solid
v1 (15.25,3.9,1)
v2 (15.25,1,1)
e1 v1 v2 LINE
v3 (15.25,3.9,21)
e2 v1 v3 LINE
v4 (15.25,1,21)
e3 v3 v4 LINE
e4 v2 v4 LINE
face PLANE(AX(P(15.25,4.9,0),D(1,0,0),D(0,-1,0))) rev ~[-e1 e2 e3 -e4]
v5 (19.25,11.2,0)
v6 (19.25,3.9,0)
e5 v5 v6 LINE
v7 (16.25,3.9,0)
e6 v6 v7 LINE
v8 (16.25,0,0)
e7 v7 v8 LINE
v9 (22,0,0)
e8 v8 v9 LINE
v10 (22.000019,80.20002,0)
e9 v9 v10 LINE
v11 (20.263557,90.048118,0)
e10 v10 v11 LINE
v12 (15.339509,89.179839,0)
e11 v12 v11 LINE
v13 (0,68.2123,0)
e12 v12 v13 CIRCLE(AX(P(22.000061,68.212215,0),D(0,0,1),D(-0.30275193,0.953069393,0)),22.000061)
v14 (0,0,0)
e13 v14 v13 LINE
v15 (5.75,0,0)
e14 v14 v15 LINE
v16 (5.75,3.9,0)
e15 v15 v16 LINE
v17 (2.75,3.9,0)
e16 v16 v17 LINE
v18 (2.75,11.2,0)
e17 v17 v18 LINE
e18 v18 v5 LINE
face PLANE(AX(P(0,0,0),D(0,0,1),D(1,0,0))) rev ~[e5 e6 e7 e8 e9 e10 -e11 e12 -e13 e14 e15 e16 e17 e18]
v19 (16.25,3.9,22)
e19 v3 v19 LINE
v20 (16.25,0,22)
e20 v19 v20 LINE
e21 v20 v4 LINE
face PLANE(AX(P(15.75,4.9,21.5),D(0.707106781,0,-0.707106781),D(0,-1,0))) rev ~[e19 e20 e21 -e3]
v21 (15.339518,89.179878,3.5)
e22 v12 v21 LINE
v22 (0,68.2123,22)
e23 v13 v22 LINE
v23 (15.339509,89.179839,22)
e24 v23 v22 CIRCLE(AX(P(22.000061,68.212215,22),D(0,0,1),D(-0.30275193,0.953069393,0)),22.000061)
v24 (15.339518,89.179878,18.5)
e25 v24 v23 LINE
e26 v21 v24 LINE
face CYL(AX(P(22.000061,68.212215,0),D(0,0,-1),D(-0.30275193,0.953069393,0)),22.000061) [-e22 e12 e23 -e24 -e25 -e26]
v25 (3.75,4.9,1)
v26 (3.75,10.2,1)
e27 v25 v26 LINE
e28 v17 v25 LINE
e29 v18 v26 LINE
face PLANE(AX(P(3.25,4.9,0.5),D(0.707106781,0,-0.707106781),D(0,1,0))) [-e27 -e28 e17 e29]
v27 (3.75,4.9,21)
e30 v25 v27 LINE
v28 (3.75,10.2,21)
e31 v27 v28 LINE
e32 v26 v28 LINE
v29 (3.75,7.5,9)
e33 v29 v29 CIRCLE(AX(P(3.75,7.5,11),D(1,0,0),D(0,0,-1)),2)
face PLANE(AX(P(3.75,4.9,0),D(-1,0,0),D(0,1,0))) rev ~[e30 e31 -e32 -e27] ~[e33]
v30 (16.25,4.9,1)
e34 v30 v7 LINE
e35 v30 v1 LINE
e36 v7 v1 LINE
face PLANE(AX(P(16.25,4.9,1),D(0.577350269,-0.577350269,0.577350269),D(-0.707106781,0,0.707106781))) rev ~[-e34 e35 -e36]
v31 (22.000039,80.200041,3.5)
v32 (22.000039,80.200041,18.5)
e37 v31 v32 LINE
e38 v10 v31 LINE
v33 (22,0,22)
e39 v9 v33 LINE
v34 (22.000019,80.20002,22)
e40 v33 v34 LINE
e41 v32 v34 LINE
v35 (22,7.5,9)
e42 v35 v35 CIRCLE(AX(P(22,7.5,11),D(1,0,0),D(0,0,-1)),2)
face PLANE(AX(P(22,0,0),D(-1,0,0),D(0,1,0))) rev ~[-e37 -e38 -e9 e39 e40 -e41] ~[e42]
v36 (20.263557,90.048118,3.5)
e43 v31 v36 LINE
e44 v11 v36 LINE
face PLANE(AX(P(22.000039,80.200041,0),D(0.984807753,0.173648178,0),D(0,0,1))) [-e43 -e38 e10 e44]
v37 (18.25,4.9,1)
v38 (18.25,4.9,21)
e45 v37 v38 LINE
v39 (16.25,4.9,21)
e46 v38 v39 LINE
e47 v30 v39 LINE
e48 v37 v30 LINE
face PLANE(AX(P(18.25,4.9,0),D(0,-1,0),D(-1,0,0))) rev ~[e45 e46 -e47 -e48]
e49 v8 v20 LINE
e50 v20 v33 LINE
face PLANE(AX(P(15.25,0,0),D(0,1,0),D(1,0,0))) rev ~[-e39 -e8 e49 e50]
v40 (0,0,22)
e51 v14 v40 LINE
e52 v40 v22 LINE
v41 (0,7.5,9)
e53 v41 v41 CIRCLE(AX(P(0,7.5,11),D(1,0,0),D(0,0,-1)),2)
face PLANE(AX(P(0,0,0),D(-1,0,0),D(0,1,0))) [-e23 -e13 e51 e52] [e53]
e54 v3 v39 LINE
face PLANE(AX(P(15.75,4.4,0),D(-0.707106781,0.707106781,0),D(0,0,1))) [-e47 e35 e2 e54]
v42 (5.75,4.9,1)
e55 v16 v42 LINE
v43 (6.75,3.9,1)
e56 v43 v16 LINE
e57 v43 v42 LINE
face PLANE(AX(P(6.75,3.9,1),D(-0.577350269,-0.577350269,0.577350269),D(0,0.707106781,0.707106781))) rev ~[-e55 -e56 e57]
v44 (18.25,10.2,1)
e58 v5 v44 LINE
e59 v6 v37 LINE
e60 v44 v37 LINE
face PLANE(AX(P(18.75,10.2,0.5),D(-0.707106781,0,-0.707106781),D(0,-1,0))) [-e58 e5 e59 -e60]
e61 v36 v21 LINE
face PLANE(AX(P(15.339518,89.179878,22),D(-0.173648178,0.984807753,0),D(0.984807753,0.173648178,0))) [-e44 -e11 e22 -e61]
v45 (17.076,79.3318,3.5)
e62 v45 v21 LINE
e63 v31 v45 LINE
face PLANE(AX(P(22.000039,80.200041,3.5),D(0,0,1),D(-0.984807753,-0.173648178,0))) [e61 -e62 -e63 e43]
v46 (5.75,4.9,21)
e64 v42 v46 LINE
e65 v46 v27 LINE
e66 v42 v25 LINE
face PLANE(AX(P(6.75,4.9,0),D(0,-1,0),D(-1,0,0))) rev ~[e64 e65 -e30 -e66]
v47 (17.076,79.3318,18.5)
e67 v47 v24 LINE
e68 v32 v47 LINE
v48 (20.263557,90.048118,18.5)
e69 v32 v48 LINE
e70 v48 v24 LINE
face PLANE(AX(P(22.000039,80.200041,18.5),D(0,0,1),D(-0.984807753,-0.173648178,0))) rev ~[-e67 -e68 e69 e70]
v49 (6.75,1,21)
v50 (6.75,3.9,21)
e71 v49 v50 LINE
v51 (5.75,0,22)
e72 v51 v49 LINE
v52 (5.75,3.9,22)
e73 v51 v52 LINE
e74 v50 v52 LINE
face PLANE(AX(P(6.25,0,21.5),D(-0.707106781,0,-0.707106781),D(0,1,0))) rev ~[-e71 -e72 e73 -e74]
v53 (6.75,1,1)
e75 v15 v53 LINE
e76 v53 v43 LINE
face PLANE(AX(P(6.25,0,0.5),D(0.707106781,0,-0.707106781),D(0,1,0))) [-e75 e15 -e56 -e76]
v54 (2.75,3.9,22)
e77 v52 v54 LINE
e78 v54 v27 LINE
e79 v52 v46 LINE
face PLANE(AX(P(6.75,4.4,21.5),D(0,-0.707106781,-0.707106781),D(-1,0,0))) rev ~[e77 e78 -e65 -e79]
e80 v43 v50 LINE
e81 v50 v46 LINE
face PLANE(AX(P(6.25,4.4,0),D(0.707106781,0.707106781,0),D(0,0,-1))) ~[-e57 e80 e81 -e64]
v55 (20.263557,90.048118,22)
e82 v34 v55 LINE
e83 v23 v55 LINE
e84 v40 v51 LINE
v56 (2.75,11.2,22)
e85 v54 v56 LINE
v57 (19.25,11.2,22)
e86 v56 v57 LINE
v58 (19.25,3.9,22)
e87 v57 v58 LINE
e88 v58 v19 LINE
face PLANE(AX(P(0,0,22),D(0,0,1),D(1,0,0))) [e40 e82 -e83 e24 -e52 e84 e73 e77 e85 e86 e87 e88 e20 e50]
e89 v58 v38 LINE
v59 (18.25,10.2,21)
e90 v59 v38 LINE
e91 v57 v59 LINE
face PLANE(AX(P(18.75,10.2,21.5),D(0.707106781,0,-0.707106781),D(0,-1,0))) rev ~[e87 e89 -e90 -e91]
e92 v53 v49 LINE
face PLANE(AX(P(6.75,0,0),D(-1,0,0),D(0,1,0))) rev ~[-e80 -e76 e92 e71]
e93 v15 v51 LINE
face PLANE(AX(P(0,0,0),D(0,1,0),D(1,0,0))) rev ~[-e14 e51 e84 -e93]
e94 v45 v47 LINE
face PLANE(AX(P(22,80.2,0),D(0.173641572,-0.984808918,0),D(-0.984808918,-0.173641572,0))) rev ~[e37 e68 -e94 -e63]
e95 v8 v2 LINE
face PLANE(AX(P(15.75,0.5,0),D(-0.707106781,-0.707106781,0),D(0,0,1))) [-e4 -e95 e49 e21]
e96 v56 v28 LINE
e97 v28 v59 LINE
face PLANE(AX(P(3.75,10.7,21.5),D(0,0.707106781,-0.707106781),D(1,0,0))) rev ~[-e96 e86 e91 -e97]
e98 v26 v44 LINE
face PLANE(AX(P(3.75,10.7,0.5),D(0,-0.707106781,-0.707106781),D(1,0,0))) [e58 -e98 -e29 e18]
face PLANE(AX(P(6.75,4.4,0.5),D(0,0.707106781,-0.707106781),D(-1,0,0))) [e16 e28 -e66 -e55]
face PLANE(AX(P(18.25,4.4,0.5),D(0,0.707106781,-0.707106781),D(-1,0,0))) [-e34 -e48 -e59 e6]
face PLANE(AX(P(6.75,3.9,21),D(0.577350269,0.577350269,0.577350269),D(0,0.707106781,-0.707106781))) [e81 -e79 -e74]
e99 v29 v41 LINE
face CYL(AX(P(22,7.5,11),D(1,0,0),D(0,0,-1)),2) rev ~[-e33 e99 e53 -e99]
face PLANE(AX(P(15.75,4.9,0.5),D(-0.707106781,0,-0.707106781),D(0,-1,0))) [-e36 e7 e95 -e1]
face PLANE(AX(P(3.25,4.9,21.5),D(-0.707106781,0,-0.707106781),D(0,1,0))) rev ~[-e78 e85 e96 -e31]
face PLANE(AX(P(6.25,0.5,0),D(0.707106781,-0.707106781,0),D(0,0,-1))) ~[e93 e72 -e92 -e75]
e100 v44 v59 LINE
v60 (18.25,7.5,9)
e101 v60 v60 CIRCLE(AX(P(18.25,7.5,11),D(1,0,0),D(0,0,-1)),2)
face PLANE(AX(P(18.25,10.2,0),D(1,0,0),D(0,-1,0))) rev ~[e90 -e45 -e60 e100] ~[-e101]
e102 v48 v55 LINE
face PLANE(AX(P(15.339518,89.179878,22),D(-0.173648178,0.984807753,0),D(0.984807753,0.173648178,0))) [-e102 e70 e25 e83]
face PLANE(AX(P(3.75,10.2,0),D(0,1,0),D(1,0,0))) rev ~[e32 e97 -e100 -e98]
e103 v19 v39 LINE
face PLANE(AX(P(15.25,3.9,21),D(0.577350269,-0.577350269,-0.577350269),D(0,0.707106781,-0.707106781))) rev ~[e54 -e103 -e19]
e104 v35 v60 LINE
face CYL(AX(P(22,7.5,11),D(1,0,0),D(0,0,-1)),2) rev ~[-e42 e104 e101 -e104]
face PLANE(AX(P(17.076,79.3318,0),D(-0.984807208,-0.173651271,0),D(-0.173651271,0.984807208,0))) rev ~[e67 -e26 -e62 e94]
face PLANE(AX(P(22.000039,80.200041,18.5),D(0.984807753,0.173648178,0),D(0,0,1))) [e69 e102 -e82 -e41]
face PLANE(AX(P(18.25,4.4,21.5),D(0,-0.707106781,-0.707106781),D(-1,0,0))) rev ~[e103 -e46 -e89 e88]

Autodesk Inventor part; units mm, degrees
ref_plane "YZ Plane" through (0, 0, 0) normal (1, 0, 0) x (0, 1, 0)
ref_plane "XZ Plane" through (0, 0, 0) normal (0, 1, 0) x (-1, 0, 0)
ref_plane "XY Plane" through (0, 0, 0) normal (0, 0, 1) x (1, 0, 0)
sketch "Skizze1" plane through (0, 0, 0) normal (0, 0, 1) x (1, 0, 0)
  line L0 (0, 0) -> (6.75, 0)
  line L1 (6.75, 0) -> (6.75, 4.9)
  line L2 (6.75, 4.9) -> (3.75, 4.9)
  line L3 (3.75, 4.9) -> (3.75, 10.2)
  line L4 (3.75, 10.2) -> (18.25, 10.2)
  line L5 (18.25, 10.2) -> (18.25, 4.9)
  line L6 (18.25, 4.9) -> (15.25, 4.9)
  line L7 (15.25, 4.9) -> (15.25, 0)
  line L8 (15.25, 0) -> (22, 0)
  line L9 (22, 0) -> (22, 80.2)
  line L10 (0, 0) -> (0, 68.2123)
  line L11 (22, 80.2) -> (22, 98.8308) construction
  line L12 (22, 80.2) -> (17.076, 79.3318)
  line L13 (17.076, 79.3318) -> (15.3395, 89.1798)
  arc A0 (22, 90.2123) -> (15.3395, 89.1798) centre (22, 68.2123) ccw construction
  arc A1 (15.3395, 89.1798) -> (0, 68.2123) centre (22, 68.2123) ccw
  dimension "d0" = 14.5
  dimension "d1" = 5.3
  dimension "d2" = 4.9
  dimension "d3" = 22
  dimension "d4" = 8.5
  dimension "d5" = 5
  dimension "d6" = 10
  dimension "d21" = 70
  dimension "d22" = 80
extrude "Extrusion1" add sketch "Skizze1" along normal blind 22
sketch "Skizze2" plane through (22, 0, 0) normal (1, 0, 0) x (0, 0, -1)
  circle A0 centre (-11, 7.5) radius 2
  line L0 (0, 0) -> (-22, 0) projected
  line L1 (0, 0) -> (0, 80.2) projected
  point P0 (0, 65.2)
  dimension "d10" = 4
  dimension "d11" = 7.5
  dimension "d12" = 11
extrude "Extrusion2" cut sketch "Skizze2" against normal blind 22
chamfer "Fasen1" distance 1 angle 45 18 edges at (3.75, 7.55, 22) (11, 10.2, 22) (18.25, 7.55, 22) (16.75, 4.9, 22) (5.25, 4.9, 22) (6.75, 2.45, 22) (15.25, 2.45, 22) (18.25, 7.55, 0) (15.25, 2.45, 0) (16.75, 4.9, 0) (11, 10.2, 0) (3.75, 7.55, 0) (5.25, 4.9, 0) (6.75, 2.45, 0) (6.75, 4.9, 11) (15.25, 4.9, 11) (6.75, 0, 11) (15.25, 0, 11)
sketch "Skizze4" plane through (17.076, 79.3318, 22) normal (-0.1736482, 0.9848078, 0) x (0.9848078, 0.1736482, 0)
  line L0 (-18.7474, 0) -> (0, 0) projected
  line L1 (5, 22) -> (5, 0) projected
  line L2 (0, 0) -> (5, 0)
  line L3 (5, 0) -> (5, 3.5)
  line L4 (5, 3.5) -> (0, 3.5)
  line L5 (0, 3.5) -> (0, 0)
  line L6 (-8.9266, 22) -> (5, 22) projected
  line L7 (0, 22) -> (5, 22)
  line L8 (5, 22) -> (5, 18.5)
  line L9 (5, 18.5) -> (0, 18.5)
  line L10 (0, 18.5) -> (0, 22)
  point P0 (-30.5924, 22)
  point P1 (2.5, 18.5)
  point P2 (5, 18.5)
  point P3 (5, 0)
  dimension "d29" = 15
extrude "Extrusion4" add sketch "Skizze4" along normal blind 10
properties part number "Gripper_V2_10deg"
